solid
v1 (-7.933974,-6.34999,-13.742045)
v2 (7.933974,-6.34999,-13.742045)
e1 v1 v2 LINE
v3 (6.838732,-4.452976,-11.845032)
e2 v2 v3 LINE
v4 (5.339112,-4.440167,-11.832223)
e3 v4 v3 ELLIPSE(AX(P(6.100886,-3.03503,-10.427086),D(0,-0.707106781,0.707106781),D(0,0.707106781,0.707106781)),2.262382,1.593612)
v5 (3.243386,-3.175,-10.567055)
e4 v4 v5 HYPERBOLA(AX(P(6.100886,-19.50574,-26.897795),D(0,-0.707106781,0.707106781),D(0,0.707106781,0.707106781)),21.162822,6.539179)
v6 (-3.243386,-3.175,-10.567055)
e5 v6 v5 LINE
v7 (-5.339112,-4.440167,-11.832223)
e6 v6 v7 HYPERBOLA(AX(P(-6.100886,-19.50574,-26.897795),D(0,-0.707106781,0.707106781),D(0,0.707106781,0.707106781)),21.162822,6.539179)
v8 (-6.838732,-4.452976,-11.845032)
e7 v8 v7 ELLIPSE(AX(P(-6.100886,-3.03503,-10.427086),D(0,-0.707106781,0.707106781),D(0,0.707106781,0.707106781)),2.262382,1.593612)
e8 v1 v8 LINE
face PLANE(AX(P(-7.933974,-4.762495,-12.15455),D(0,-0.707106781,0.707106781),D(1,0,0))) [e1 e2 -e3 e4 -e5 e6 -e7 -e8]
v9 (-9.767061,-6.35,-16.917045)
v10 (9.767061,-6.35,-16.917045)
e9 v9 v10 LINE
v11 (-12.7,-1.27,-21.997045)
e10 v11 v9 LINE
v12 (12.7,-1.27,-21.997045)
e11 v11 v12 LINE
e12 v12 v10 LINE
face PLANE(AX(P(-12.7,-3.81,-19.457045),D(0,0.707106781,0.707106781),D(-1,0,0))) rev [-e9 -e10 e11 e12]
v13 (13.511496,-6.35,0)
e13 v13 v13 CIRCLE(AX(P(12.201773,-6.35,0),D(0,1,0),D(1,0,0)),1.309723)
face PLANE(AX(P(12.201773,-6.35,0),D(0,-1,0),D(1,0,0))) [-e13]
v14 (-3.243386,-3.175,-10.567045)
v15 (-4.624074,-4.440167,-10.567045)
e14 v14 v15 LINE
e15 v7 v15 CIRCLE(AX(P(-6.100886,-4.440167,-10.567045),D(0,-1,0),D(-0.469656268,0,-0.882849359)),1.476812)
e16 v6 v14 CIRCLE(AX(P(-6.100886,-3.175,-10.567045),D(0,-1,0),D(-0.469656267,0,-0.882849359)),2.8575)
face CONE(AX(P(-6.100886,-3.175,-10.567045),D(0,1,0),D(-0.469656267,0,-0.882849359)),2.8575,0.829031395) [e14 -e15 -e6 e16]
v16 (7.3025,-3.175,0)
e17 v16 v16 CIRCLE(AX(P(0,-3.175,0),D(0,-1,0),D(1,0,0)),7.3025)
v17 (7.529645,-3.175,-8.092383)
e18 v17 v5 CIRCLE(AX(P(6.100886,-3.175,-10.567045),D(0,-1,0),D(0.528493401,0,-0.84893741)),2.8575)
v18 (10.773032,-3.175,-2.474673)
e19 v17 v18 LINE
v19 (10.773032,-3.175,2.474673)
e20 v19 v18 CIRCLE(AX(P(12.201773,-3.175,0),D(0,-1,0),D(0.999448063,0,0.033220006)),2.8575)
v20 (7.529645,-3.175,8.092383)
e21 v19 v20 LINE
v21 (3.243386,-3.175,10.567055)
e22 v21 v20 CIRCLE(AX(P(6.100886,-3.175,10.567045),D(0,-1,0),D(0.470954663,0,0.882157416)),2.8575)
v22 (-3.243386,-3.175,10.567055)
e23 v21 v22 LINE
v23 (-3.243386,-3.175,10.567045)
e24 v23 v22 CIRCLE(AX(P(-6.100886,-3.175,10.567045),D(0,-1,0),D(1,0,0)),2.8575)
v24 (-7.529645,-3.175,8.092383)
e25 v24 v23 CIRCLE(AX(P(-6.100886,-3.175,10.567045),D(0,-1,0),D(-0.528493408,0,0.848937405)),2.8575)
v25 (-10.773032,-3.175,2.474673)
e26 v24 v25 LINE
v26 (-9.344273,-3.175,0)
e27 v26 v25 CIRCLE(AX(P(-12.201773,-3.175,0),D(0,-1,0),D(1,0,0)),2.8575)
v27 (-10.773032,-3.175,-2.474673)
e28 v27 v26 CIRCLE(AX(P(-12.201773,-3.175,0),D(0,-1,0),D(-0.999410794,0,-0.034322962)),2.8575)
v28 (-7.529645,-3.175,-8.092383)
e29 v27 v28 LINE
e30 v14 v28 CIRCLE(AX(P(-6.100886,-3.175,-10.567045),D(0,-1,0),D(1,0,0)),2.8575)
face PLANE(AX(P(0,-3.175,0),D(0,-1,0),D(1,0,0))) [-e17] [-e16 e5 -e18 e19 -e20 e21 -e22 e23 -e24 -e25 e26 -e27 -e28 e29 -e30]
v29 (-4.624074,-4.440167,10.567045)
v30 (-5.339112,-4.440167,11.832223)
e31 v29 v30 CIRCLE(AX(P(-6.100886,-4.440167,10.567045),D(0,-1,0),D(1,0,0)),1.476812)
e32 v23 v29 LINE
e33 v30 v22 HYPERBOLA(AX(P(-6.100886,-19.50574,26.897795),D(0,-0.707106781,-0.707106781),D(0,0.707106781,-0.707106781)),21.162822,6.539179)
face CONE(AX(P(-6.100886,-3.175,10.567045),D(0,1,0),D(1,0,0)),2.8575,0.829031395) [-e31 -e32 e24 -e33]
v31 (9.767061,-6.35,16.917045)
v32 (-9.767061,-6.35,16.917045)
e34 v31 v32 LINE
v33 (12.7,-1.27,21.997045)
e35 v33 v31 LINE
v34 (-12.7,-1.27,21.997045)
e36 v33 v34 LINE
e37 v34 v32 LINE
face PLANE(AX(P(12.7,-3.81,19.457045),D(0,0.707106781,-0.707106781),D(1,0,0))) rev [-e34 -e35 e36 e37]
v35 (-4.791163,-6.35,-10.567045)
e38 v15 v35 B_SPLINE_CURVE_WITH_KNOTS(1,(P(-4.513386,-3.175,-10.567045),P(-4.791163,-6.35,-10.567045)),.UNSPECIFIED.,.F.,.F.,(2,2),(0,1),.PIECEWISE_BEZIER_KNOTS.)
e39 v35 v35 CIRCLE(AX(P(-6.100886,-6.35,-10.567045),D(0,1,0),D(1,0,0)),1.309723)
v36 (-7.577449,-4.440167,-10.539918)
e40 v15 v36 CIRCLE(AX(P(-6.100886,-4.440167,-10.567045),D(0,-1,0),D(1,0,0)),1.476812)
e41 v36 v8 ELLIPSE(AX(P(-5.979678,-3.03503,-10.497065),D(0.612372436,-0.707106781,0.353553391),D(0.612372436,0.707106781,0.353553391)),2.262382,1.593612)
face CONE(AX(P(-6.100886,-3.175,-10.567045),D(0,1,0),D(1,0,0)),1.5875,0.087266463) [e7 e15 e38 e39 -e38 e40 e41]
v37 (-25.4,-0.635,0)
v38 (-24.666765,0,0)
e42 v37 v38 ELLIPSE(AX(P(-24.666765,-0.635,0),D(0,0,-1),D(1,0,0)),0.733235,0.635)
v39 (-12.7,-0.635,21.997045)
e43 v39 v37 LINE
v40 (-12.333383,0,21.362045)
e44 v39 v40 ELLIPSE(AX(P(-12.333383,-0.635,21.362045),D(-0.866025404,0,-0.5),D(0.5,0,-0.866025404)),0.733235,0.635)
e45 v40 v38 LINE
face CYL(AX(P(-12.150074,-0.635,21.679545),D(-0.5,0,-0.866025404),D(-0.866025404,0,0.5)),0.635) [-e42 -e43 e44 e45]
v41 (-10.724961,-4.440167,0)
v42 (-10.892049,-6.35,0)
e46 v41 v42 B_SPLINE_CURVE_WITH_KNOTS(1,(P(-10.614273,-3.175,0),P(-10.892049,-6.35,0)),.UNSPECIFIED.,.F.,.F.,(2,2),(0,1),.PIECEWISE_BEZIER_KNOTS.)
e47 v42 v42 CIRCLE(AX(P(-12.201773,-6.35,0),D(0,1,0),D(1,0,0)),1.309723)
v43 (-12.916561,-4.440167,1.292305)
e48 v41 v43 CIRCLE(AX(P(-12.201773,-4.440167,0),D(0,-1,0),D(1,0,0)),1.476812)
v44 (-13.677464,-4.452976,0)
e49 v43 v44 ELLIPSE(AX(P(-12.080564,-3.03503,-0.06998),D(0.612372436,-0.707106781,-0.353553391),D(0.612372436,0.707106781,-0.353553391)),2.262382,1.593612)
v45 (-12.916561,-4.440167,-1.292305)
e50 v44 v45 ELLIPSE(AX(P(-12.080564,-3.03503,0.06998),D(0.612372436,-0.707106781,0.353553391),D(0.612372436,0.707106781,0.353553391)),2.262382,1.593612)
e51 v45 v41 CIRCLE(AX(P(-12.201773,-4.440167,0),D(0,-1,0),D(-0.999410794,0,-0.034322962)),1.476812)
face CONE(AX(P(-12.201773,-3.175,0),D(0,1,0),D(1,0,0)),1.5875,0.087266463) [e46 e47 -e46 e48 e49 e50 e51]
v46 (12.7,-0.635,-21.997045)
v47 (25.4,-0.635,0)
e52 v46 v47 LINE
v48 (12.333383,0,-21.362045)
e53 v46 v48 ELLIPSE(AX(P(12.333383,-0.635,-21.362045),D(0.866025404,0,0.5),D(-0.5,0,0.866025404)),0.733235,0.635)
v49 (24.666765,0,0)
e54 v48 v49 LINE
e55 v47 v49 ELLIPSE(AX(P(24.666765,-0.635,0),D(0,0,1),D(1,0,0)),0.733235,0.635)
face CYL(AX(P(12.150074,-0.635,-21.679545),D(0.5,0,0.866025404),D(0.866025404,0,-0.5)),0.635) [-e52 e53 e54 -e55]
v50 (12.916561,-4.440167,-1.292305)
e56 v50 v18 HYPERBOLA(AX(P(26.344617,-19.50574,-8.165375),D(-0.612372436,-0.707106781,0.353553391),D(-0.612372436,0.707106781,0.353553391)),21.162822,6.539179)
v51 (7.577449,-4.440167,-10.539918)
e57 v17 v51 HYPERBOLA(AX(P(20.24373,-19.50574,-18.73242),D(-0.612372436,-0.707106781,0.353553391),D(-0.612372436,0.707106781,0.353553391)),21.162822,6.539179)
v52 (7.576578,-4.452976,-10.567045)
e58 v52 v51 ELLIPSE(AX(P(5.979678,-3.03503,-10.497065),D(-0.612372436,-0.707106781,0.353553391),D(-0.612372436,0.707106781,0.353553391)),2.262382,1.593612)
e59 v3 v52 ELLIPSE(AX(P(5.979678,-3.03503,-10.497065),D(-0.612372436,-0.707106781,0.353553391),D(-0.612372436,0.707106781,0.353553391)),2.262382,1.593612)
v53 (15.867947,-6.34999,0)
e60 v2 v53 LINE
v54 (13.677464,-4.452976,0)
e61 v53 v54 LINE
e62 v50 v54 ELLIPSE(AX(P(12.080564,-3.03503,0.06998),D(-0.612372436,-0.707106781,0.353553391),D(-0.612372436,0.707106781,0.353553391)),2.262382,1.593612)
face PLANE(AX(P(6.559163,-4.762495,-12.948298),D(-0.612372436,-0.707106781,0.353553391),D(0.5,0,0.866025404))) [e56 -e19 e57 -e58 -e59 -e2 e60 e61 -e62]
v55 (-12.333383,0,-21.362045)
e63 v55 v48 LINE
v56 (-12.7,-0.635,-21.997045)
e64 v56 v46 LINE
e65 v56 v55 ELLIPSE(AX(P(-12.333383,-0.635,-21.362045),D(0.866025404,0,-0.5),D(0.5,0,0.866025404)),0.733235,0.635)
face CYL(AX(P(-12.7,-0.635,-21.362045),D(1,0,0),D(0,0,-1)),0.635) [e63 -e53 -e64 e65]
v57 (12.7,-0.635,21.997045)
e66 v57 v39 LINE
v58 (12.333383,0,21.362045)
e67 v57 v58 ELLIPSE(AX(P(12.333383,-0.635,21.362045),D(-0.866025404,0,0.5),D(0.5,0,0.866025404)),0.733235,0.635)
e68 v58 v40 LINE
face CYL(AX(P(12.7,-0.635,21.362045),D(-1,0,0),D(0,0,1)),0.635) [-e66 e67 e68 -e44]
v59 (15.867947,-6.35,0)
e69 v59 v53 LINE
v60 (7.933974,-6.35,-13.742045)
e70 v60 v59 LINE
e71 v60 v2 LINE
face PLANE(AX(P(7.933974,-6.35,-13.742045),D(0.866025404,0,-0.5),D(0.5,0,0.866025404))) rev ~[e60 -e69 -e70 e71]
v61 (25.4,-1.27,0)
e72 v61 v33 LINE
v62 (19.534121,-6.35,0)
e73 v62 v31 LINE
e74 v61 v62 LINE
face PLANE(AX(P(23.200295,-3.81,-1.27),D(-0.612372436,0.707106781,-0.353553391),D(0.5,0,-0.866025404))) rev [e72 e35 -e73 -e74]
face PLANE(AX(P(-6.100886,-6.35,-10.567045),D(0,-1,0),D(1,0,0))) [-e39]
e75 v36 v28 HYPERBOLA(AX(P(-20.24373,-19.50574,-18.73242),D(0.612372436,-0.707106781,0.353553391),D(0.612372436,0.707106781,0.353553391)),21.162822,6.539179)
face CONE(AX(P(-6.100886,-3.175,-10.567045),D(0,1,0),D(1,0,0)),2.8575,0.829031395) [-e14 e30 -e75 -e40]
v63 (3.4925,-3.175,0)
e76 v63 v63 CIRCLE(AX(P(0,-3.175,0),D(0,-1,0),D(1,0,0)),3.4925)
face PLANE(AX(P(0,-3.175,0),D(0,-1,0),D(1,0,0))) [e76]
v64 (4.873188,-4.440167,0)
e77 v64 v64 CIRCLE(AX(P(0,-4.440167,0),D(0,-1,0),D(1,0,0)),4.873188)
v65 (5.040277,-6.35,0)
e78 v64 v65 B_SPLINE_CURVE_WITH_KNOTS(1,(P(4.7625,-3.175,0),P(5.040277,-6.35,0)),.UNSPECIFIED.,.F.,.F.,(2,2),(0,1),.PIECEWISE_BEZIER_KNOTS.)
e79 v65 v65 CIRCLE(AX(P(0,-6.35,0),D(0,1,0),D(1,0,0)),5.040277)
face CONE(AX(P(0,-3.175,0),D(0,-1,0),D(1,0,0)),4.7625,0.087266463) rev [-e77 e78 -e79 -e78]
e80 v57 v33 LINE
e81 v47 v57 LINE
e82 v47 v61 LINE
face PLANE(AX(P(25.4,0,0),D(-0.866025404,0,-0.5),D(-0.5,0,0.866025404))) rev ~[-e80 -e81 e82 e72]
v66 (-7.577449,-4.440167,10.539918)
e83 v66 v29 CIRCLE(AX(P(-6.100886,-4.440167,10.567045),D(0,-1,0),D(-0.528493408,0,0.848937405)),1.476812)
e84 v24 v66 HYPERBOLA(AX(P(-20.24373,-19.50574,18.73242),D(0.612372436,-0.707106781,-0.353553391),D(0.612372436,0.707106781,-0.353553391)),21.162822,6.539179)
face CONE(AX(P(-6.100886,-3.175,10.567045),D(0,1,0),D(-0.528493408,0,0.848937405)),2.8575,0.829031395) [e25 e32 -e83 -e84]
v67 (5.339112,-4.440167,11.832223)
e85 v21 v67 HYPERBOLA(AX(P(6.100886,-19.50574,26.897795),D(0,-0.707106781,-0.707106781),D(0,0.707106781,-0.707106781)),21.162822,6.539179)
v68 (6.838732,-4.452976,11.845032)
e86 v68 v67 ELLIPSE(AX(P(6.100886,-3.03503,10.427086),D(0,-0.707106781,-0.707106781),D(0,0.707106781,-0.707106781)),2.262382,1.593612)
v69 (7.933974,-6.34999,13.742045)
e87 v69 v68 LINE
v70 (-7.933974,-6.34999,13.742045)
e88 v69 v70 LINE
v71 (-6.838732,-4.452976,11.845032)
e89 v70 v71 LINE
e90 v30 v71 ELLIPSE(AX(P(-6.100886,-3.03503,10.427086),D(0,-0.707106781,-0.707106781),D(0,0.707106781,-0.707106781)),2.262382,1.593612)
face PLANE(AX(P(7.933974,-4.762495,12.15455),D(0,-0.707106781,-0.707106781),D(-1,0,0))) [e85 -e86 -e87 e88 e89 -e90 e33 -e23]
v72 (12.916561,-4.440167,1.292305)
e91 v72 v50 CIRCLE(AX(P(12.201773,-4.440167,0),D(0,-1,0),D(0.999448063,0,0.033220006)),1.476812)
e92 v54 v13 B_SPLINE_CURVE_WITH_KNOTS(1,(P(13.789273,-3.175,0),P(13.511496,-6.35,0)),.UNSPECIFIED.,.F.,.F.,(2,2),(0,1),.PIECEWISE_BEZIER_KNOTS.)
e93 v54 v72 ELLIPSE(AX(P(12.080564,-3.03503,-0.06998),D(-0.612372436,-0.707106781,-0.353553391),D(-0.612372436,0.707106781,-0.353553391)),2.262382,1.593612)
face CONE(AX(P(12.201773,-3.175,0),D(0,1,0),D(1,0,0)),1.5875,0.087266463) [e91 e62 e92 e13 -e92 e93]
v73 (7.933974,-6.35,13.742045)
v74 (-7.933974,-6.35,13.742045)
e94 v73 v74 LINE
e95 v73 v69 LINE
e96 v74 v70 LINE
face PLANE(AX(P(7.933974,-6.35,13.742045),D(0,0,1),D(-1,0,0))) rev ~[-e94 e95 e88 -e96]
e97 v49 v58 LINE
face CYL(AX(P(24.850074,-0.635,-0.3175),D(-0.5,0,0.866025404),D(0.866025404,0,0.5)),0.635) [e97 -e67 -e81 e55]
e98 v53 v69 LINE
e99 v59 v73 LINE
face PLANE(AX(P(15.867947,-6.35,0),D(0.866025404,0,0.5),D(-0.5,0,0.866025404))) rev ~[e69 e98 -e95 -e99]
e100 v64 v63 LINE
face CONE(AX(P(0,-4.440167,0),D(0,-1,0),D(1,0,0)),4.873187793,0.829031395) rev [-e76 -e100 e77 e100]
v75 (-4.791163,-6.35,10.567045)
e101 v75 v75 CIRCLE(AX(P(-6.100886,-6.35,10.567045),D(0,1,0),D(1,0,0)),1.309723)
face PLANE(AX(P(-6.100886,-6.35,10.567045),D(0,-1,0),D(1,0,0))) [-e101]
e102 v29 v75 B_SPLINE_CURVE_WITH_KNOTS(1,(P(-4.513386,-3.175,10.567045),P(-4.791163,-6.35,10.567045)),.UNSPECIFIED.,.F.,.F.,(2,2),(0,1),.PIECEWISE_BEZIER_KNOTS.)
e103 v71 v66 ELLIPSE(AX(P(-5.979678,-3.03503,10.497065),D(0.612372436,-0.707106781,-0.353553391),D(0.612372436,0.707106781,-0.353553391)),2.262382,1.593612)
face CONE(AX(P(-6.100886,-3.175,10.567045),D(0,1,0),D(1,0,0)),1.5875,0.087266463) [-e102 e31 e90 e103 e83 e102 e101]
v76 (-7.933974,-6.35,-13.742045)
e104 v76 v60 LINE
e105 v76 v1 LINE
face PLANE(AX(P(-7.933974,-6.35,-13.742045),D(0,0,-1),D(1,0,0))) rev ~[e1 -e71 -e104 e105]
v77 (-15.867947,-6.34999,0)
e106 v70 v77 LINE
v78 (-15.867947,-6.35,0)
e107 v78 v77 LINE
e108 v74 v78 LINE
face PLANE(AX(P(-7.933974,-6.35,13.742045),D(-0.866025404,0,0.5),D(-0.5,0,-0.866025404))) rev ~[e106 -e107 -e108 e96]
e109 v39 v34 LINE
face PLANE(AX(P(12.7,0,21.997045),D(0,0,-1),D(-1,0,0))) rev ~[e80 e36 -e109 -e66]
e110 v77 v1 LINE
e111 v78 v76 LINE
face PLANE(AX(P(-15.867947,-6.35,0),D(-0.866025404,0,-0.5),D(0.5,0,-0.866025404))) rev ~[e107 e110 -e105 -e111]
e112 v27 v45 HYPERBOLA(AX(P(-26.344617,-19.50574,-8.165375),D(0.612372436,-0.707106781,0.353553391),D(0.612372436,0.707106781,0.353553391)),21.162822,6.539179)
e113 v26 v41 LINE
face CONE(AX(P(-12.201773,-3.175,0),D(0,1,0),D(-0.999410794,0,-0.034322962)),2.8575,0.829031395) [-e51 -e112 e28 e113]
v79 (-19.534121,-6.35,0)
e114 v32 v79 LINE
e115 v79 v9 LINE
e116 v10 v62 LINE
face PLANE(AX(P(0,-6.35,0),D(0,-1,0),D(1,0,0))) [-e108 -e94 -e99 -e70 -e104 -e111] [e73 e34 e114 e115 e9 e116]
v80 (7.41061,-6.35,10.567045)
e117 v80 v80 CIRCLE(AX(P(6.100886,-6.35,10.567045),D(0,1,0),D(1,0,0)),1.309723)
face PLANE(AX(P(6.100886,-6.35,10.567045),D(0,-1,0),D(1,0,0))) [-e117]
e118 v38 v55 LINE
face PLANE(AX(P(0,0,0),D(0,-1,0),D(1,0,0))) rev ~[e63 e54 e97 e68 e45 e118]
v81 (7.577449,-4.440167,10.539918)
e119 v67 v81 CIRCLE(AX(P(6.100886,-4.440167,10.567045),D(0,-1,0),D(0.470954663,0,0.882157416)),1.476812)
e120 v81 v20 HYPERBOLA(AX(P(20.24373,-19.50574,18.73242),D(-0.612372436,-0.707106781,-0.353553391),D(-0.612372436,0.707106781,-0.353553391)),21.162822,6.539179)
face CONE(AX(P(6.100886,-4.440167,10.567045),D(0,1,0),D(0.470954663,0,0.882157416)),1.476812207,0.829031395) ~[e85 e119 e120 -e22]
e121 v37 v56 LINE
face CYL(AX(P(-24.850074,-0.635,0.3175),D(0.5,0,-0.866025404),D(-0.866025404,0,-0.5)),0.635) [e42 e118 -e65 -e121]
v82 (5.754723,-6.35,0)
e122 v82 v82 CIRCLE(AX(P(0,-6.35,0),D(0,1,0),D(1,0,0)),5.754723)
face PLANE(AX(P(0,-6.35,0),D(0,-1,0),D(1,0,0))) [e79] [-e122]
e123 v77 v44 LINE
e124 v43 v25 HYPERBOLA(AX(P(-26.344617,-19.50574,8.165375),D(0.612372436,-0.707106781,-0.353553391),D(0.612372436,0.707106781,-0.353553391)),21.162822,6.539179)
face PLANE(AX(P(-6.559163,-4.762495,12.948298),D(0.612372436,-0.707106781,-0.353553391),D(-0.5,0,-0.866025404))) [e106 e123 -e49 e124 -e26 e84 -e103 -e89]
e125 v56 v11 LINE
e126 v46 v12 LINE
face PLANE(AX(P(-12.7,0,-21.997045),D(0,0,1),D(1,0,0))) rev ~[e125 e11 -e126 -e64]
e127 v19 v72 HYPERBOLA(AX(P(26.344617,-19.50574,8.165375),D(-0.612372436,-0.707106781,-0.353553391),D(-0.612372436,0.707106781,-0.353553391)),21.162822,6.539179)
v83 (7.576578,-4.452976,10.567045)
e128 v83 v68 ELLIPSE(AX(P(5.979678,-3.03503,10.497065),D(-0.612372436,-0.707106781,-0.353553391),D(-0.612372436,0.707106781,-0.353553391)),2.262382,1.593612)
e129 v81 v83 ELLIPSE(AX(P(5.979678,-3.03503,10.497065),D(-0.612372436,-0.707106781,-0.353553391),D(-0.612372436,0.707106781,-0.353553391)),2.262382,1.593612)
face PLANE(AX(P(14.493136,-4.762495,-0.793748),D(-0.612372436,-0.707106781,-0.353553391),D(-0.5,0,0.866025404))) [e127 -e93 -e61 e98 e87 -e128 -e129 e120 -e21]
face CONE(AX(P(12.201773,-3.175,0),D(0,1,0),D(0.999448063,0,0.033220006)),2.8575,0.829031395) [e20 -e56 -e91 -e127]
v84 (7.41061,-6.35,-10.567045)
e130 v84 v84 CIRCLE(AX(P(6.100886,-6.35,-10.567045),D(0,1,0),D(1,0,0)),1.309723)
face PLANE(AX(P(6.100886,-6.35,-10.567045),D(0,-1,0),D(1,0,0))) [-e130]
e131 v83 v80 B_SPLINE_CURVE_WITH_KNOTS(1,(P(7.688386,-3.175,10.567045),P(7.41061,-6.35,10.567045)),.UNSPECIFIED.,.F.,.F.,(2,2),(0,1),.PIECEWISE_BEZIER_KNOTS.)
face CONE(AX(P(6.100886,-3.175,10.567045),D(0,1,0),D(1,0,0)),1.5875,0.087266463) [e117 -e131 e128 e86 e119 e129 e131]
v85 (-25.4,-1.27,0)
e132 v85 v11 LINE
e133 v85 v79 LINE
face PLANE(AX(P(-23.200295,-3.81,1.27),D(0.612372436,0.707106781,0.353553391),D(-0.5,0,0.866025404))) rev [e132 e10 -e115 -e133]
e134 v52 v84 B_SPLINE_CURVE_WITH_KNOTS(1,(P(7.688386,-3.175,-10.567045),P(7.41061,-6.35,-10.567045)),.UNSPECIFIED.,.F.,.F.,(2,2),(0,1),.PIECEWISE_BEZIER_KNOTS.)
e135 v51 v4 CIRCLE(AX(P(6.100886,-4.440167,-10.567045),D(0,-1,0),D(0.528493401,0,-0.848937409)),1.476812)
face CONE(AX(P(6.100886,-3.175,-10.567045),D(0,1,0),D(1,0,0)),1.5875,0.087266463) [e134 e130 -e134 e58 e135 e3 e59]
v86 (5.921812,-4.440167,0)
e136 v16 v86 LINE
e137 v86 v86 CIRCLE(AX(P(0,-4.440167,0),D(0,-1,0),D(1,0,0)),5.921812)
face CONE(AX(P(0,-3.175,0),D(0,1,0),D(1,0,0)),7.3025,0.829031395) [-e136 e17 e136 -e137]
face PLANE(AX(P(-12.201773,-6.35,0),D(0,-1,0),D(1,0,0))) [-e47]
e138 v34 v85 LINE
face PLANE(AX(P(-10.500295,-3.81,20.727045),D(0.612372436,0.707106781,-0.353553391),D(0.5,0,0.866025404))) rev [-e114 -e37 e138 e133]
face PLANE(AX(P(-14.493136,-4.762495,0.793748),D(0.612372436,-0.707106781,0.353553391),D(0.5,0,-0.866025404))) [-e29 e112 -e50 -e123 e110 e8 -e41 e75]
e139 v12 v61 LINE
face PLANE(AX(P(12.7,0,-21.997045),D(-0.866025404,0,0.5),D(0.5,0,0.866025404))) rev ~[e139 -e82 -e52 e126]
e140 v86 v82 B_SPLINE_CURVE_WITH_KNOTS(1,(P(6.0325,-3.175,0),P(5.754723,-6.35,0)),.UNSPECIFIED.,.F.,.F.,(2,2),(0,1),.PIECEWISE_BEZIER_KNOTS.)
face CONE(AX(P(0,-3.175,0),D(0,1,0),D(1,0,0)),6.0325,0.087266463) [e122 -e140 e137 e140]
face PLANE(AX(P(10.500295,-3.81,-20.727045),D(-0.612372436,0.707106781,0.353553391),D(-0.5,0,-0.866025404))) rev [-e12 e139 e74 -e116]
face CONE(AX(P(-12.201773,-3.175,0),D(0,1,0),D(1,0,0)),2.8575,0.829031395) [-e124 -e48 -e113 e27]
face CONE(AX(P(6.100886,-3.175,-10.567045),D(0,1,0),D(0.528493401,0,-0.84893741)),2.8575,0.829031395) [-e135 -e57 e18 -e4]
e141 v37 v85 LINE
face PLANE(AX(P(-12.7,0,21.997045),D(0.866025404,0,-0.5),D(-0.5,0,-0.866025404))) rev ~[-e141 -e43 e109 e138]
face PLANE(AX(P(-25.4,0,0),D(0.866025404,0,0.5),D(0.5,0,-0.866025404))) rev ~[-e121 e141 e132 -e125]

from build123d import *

# Parameters (mm, degrees)
F1_DEPTH     = 6.35
F2_SIZE      = 5.08
F4_DEPTH     = 3.175
F5_SIZE      = 3.17499
F6_R         = 0.635
F7_R         = 1.5875
F7_R_2       = 6.0325
F7_R_3       = 4.7625
F8_DEPTH     = 3.175
F8_TAPER     = 5
F9_T6_ANGLE  = 356.192567219
F9_T8_ANGLE  = 356.192567219
F9_T10_ANGLE = 238.0962831022
F9_T12_ANGLE = 118.0119864136
F9_T14_ANGLE = 178.0330528129
F9_T16_ANGLE = 178.0330528129
F9_T18_ANGLE = 118.0119864072
F9_T20_ANGLE = 238.0962831022
F9_T22_ANGLE = 356.192567219


# Not quite as in the source:
# - a fillet or chamfer that OpenCascade refuses, or shapes differently, is made with other operations: its cross-section is extruded or revolved along the edge and cut away or added
# - a fillet or chamfer is up to 0.001 mm smaller than in the source, because OpenCascade refuses the exact size


with BuildPart() as f1:
    # F0 (on Front) → F1 (new body)
    with BuildSketch(Plane.XZ):
        Polygon((-12.7, 21.9970452561), (-25.4, 0), (-12.7, -21.9970452561), (12.7, -21.9970452561), (25.4, 0), (12.7, 21.9970452561), align=None)
    extrude(amount=F1_DEPTH)

    # F2
    f2_edges = [f1.edges().sort_by_distance(p)[0] for p in [
        (0, -6.35, -21.997045),
        (19.05, -6.35, -10.998523),
        (19.05, -6.35, 10.998523),
        (0, -6.35, 21.997045),
        (-19.05, -6.35, 10.998523),
        (-19.05, -6.35, -10.998523),
    ]]
    chamfer(f2_edges, length=F2_SIZE)

    # F3 (on face) → F4 (cut)
    with BuildSketch(Plane.XZ.offset(6.35)):
        Polygon((7.9339735278, 13.7420452561), (-7.9339735278, 13.7420452561), (-15.8679470557, 0), (-7.9339735278, -13.7420452561), (7.9339735278, -13.7420452561), (15.8679470557, 0), align=None)
    extrude(amount=-F4_DEPTH, mode=Mode.SUBTRACT)

    # F5 (size 3.175 in the source; OpenCascade refuses exactly that, so slightly less here)
    f5_edges = [f1.edges().sort_by_distance(p)[0] for p in [
        (-11.90096, -3.175, 6.871023),
        (0, -3.175, 13.742045),
        (-11.90096, -3.175, -6.871023),
        (0, -3.175, -13.742045),
        (11.90096, -3.175, -6.871023),
        (11.90096, -3.175, 6.871023),
    ]]
    chamfer(f5_edges, length=F5_SIZE)

    # F6
    f6_edges = [f1.edges().sort_by_distance(p)[0] for p in [
        (19.05, 0, -10.998523),
        (19.05, 0, 10.998523),
        (0, 0, -21.997045),
        (-19.05, 0, -10.998523),
        (-19.05, 0, 10.998523),
        (0, 0, 21.997045),
    ]]
    fillet(f6_edges, radius=F6_R)

    # F7 (on face) → F8 (join)
    with BuildSketch(Plane.XZ.offset(3.175)):
        with Locations((12.2017728463, 0)):
            Circle(F7_R)
        Circle(F7_R_2)
        Circle(F7_R_3, mode=Mode.SUBTRACT)
        with Locations((6.1008864232, 10.5670452561)):
            Circle(F7_R)
        with Locations((-6.1008864232, 10.5670452561)):
            Circle(F7_R)
        with Locations((-12.2017728463, 0)):
            Circle(F7_R)
        with Locations((-6.1008864232, -10.5670452561)):
            Circle(F7_R)
        with Locations((6.1008864232, -10.5670452561)):
            Circle(F7_R)
    extrude(amount=F8_DEPTH, taper=F8_TAPER)

    # F9: chamfer of 1.27 on 11 edges, made by hand

    # F9_s1 → F9_t2 (revolve)
    with BuildSketch(Plane.XY):
        Polygon((4.8731877933, -4.4401672666), (3.4925, -3.175), (4.7625, -3.175), align=None)
    revolve(axis=Axis((0, -3.175, 0), (0, -1, 0)))

    # F9_s3 → F9_t4 (revolve)
    with BuildSketch(Plane.XY):
        Polygon((7.3025, -3.175), (5.9218122067, -4.4401672666), (6.0325, -3.175), align=None)
    revolve(axis=Axis((0, -3.175, 0), (0, -1, 0)))

    # F9_s5 → F9_t6 (revolve)
    with BuildSketch(Plane(origin=(0.0134654957, 0, -0.4051192424), x_dir=(0, 1, 0), z_dir=(0.0332200059, 0, -0.9994480633))):
        Polygon((-3.175, 15.0525382399), (-4.4401672666, 13.6718504466), (-3.175, 13.7825382399), align=None)
    revolve(axis=Axis((12.2017728463, -3.175, 0), (0, -1, 0)), revolution_arc=F9_T6_ANGLE)

    # F9_s7 → F9_t8 (revolve)
    with BuildSketch(Plane(origin=(0.3575763033, 0, -0.1908981598), x_dir=(0, 1, 0), z_dir=(0.8821574155, 0, -0.4709546626))):
        Polygon((-4.4401672666, 13.6718504466), (-3.175, 15.0525382399), (-3.175, 13.7825382399), align=None)
    revolve(axis=Axis((6.1008864232, -3.175, 10.5670452561), (0, -1, 0)), revolution_arc=F9_T8_ANGLE)

    # F9_s9 → F9_t10 (revolve)
    with BuildSketch(Plane(origin=(0.3441108974, 0, 0.2142211427), x_dir=(0, 1, 0), z_dir=(0.8489374049, 0, 0.5284934082))):
        Polygon((-3.175, 15.0525382363), (-4.4401672666, 13.671850443), (-3.175, 13.7825382363), align=None)
    revolve(axis=Axis((-6.1008864232, -3.175, 10.5670452561), (0, -1, 0)), revolution_arc=F9_T10_ANGLE)

    # F9_s11 → F9_t12 (revolve)
    with BuildSketch(Plane.XY.offset(10.5670452561)):
        Polygon((-3.2433864232, -3.175), (-4.6240742165, -4.4401672666), (-4.5133864232, -3.175), align=None)
    revolve(axis=Axis((-6.1008864232, -3.175, 10.5670452561), (0, -1, 0)), revolution_arc=F9_T12_ANGLE)

    # F9_s13 → F9_t14 (revolve)
    with BuildSketch(Plane(origin=(-0.0143744903, 0, 0.4185542247), x_dir=(0, 1, 0), z_dir=(-0.0343229619, 0, 0.9994107936))):
        Polygon((-3.175, 15.0520834832), (-4.4401672666, 13.6713956899), (-3.175, 13.7820834832), align=None)
    revolve(axis=Axis((-12.2017728463, -3.175, 0), (0, -1, 0)), revolution_arc=F9_T14_ANGLE)

    # F9_s15 → F9_t16 (revolve)
    with BuildSketch(Plane.XY):
        Polygon((-9.3442728463, -3.175), (-10.7249606396, -4.4401672666), (-10.6142728463, -3.175), align=None)
    revolve(axis=Axis((-12.2017728463, -3.175, 0), (0, -1, 0)), revolution_arc=F9_T16_ANGLE)

    # F9_s17 → F9_t18 (revolve)
    with BuildSketch(Plane(origin=(-0.3736965716, 0, 0.1987982832), x_dir=(0, 1, 0), z_dir=(-0.882849359, 0, 0.4696562672))):
        Polygon((-3.175, 15.0519286749), (-4.4401672666, 13.6712408817), (-3.175, 13.7819286749), align=None)
    revolve(axis=Axis((-6.1008864232, -3.175, -10.5670452561), (0, -1, 0)), revolution_arc=F9_T18_ANGLE)

    # F9_s19 → F9_t20 (revolve)
    with BuildSketch(Plane.XY.offset(-10.5670452561)):
        Polygon((-3.2433864232, -3.175), (-4.6240742165, -4.4401672666), (-4.5133864232, -3.175), align=None)
    revolve(axis=Axis((-6.1008864232, -3.175, -10.5670452561), (0, -1, 0)), revolution_arc=F9_T20_ANGLE)

    # F9_s21 → F9_t22 (revolve)
    with BuildSketch(Plane(origin=(-0.3441108076, 0, -0.2142210826), x_dir=(0, 1, 0), z_dir=(-0.8489374096, 0, -0.5284934007))):
        Polygon((-3.175, 15.0525382399), (-4.4401672666, 13.6718504466), (-3.175, 13.7825382399), align=None)
    revolve(axis=Axis((6.1008864232, -3.175, -10.5670452561), (0, -1, 0)), revolution_arc=F9_T22_ANGLE)


solid = f1.part
